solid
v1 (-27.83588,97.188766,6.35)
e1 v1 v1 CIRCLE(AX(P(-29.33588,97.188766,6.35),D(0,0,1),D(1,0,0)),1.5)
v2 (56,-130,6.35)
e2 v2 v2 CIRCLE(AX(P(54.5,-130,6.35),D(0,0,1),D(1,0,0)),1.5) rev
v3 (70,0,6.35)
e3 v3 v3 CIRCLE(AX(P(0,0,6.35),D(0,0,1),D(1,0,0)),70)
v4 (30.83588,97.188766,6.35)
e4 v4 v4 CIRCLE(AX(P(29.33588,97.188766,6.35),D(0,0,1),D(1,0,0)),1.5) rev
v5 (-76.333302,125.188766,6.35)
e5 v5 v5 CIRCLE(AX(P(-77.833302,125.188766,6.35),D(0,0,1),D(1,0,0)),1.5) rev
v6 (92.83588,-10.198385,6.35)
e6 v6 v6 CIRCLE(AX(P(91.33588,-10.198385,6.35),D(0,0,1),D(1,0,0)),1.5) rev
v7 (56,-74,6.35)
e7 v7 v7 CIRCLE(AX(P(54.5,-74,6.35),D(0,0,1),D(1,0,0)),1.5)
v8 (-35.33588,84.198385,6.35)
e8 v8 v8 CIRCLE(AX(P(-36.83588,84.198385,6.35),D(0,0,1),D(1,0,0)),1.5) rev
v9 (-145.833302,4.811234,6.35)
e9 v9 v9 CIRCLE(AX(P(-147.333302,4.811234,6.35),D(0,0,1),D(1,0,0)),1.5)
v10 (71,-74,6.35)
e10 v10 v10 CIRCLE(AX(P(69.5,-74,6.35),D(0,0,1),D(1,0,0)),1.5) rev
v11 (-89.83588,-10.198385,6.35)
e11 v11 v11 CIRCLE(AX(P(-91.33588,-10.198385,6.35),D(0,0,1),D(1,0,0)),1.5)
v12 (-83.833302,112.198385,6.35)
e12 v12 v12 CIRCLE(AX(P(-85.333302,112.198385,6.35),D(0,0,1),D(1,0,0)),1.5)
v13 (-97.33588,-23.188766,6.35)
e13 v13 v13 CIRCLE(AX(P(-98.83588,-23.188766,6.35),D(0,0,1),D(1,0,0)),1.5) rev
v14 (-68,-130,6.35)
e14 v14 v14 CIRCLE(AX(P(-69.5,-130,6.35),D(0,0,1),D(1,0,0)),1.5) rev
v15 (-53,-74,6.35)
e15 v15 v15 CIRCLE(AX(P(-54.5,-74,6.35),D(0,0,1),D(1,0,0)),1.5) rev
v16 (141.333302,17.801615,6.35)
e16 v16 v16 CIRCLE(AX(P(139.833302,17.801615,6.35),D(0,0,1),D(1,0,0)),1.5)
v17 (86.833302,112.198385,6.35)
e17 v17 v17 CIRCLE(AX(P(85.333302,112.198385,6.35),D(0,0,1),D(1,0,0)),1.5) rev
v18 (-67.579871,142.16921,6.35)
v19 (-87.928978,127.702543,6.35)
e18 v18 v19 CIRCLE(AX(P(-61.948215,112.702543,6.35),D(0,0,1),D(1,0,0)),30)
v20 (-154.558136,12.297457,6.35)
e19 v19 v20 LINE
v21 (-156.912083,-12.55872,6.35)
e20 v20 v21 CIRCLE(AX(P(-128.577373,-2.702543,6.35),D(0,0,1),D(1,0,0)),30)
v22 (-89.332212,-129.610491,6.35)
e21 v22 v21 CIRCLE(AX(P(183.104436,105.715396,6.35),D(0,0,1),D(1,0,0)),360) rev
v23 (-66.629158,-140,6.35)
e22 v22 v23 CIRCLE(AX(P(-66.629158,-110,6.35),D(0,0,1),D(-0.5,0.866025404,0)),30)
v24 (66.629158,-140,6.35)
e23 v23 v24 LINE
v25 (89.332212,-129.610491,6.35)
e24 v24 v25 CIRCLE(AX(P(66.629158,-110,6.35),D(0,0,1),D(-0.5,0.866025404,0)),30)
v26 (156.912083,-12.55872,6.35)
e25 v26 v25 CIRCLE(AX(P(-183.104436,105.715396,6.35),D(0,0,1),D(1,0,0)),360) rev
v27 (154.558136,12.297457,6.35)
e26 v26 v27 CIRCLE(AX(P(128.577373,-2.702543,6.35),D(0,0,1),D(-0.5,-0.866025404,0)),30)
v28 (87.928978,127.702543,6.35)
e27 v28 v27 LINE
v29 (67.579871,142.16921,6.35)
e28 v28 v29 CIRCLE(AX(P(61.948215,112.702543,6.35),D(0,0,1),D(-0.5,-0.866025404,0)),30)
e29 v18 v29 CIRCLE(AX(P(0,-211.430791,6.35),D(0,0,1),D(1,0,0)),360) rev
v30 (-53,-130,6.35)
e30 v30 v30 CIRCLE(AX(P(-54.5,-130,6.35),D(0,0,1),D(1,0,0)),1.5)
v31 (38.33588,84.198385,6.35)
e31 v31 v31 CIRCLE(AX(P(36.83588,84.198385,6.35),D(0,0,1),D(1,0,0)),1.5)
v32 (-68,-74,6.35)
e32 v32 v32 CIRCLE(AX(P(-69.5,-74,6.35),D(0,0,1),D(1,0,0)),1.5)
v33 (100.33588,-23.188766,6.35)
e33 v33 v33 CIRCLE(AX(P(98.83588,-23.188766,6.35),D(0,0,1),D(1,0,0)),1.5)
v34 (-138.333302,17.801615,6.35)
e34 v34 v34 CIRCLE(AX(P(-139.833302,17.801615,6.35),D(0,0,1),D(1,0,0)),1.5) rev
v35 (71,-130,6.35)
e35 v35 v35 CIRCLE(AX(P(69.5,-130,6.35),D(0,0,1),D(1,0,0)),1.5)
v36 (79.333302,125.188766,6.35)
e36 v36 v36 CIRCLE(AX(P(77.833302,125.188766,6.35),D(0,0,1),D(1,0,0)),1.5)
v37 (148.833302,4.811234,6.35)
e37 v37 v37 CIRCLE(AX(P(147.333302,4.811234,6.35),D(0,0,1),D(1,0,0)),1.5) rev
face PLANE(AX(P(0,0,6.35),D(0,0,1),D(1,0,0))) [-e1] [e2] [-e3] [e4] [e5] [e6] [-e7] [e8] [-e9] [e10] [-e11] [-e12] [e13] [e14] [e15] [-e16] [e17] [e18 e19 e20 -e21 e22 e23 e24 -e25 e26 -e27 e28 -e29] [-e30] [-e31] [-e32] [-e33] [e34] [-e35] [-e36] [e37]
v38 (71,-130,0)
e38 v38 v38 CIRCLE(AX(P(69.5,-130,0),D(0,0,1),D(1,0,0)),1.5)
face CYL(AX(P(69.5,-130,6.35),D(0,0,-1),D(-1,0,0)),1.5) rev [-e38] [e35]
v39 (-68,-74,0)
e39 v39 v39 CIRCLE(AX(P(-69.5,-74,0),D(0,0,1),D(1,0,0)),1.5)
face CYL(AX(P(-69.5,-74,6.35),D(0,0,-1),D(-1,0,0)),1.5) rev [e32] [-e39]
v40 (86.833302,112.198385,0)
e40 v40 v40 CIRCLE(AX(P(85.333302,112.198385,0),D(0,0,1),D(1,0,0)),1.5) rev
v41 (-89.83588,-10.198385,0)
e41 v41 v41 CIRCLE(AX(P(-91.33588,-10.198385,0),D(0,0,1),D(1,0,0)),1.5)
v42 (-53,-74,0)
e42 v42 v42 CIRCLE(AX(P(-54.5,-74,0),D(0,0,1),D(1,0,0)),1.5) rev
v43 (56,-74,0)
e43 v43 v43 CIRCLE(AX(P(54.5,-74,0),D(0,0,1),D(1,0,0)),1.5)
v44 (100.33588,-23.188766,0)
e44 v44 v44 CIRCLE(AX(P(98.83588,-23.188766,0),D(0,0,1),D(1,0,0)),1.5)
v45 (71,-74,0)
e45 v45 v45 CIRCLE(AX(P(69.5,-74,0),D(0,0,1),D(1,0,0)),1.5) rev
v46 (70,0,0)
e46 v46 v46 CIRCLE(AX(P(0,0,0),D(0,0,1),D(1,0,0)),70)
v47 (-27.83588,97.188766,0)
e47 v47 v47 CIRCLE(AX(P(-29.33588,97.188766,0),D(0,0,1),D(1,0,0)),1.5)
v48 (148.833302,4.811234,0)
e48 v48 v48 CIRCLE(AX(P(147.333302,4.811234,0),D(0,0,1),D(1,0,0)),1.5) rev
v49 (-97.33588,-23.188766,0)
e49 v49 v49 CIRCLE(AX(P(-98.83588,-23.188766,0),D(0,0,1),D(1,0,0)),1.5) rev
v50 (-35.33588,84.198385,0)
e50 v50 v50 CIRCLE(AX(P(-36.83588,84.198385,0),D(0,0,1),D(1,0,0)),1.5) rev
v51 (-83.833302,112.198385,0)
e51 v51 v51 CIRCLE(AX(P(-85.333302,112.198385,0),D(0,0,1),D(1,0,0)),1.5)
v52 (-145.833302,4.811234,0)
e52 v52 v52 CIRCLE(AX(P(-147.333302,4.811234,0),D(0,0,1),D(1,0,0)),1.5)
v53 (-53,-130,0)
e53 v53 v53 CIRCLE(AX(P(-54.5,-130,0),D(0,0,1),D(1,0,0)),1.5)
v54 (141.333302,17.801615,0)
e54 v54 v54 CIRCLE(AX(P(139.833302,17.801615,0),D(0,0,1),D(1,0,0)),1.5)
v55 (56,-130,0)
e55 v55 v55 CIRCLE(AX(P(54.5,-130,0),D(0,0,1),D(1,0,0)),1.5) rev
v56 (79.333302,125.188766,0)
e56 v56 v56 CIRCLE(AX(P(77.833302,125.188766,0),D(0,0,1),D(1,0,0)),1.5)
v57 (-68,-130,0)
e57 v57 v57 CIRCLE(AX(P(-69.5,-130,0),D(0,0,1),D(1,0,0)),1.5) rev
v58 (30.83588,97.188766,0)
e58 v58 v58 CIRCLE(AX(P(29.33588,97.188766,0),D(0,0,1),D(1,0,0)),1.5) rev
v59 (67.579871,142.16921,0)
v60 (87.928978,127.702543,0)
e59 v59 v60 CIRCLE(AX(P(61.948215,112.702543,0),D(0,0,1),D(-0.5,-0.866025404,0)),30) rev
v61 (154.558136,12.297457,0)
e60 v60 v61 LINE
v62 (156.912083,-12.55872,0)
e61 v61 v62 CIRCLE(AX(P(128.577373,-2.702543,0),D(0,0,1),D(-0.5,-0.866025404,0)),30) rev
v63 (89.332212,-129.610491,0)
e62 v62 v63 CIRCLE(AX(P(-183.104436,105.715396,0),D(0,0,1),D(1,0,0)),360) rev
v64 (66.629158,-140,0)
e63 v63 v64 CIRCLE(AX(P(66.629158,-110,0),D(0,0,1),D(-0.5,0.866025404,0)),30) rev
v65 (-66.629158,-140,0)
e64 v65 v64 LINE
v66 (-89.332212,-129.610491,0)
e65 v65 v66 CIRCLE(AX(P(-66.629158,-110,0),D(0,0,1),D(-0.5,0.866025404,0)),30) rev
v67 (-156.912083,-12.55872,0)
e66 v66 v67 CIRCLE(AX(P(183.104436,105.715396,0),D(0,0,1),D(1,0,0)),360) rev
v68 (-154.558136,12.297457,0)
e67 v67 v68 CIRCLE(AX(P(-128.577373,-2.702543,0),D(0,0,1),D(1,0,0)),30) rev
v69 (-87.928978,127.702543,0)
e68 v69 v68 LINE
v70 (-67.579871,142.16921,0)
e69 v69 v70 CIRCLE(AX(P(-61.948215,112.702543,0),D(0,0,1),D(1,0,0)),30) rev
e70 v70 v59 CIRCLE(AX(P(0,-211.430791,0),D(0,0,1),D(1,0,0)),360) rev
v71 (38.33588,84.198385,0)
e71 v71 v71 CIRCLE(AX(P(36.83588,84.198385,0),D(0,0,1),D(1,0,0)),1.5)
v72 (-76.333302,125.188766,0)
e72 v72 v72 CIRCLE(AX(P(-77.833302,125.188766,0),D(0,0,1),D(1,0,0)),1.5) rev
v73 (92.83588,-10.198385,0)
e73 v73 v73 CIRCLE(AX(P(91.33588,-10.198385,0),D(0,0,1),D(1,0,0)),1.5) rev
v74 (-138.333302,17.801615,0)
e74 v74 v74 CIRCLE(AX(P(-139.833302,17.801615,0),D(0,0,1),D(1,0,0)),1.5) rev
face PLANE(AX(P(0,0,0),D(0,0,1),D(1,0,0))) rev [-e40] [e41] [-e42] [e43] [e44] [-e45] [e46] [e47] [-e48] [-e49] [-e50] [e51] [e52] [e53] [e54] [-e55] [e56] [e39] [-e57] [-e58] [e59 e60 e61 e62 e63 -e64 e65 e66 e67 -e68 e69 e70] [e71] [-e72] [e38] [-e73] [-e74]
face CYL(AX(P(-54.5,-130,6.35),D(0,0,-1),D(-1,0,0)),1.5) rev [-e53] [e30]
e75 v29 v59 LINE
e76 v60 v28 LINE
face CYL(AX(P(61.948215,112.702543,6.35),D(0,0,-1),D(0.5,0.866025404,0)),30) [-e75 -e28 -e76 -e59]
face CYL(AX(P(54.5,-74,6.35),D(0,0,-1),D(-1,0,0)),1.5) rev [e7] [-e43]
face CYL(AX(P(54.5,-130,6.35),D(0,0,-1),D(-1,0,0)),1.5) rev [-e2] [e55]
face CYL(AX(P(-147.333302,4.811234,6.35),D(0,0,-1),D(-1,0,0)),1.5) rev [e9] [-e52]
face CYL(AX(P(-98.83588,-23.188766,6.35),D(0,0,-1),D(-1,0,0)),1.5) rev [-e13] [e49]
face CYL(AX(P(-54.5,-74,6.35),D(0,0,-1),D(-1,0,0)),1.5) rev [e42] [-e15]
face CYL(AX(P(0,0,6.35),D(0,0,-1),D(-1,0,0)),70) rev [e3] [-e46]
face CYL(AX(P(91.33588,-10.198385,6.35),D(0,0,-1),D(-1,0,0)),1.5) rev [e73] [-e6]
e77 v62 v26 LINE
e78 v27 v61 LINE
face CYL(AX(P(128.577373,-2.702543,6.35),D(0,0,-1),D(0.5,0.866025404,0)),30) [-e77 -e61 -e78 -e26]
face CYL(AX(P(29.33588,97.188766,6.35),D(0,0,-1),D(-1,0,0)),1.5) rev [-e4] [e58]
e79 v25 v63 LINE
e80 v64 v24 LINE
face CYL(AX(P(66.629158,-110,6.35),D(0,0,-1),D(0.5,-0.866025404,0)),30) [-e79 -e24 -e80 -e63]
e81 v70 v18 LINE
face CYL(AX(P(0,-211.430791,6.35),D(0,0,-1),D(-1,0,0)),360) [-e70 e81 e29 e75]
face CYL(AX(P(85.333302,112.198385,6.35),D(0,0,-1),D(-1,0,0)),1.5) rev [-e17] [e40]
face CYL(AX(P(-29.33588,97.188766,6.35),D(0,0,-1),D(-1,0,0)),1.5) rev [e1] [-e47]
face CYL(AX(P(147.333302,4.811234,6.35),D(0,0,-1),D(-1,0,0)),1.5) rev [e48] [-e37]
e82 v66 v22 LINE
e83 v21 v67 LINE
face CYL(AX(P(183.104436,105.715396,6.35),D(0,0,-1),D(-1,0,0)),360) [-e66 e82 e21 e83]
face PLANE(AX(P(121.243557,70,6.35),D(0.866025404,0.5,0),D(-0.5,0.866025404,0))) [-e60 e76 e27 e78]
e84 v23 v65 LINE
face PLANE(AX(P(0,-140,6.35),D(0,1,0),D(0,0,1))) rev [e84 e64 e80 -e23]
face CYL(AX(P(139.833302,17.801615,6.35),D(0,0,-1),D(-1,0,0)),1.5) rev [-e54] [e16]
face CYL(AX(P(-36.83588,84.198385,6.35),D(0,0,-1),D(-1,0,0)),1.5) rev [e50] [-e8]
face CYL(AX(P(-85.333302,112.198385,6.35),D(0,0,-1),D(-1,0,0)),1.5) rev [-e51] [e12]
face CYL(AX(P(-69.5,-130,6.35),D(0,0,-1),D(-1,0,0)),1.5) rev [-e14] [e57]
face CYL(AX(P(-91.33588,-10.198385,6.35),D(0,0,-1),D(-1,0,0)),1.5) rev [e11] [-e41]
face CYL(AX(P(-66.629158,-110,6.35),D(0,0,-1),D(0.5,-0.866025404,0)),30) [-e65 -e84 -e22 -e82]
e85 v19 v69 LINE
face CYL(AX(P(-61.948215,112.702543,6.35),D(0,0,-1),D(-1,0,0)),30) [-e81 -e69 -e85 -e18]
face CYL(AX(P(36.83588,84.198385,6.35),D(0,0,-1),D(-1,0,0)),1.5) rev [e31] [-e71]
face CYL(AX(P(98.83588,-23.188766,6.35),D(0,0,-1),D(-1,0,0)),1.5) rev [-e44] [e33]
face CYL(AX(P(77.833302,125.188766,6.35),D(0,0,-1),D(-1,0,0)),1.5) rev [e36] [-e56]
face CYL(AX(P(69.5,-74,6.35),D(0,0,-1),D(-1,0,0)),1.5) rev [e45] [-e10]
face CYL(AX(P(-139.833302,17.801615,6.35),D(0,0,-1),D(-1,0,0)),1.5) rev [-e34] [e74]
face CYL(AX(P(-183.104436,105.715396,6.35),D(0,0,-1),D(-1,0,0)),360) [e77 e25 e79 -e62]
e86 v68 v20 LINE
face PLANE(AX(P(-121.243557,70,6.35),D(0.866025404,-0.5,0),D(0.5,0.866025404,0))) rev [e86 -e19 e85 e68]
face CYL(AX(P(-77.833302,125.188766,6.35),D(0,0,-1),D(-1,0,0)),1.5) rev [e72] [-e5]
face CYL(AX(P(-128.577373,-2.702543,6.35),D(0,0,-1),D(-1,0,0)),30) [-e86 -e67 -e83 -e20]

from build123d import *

# Parameters (mm, degrees)
SKETCH1_R           = 1.5
SKETCH1_R_2         = 70
BOSS_EXTRUDE2_DEPTH = 6.35
FILLET1_R           = 30
CIRPATTERN1_DEPTH   = 6.35


# Read off the part's stored shape, not the designer's step: CirPattern1
with BuildPart() as part:
    # Sketch1 → Boss-Extrude2 (new body)
    with BuildSketch(Plane.XY):
        with BuildLine():
            ThreePointArc((80, -140), (128.664709099, -74.284604433), (161.24355653, 0.717967697))
            Line((161.24355653, 0.717967697), (81.24355653, 139.282032303))
            ThreePointArc((81.24355653, 139.282032303), (0, 148.569208867), (-81.24355653, 139.282032303))
            Line((-81.24355653, 139.282032303), (-161.24355653, 0.717967697))
            ThreePointArc((-161.24355653, 0.717967697), (-128.664709099, -74.284604433), (-80, -140))
            Line((-80, -140), (80, -140))
        make_face()
        with Locations((85.333302492, 112.198384506)):
            Circle(SKETCH1_R, mode=Mode.SUBTRACT)
        with Locations((-85.333302492, 112.198384506)):
            Circle(SKETCH1_R, mode=Mode.SUBTRACT)
        with Locations((-69.5, -130)):
            Circle(SKETCH1_R, mode=Mode.SUBTRACT)
        with Locations((-54.5, -130)):
            Circle(SKETCH1_R, mode=Mode.SUBTRACT)
        with Locations((-69.5, -74)):
            Circle(SKETCH1_R, mode=Mode.SUBTRACT)
        with Locations((-54.5, -74)):
            Circle(SKETCH1_R, mode=Mode.SUBTRACT)
        with Locations((-98.83587988, -23.188765563)):
            Circle(SKETCH1_R, mode=Mode.SUBTRACT)
        with Locations((54.5, -130)):
            Circle(SKETCH1_R, mode=Mode.SUBTRACT)
        with Locations((69.5, -130)):
            Circle(SKETCH1_R, mode=Mode.SUBTRACT)
        with Locations((54.5, -74)):
            Circle(SKETCH1_R, mode=Mode.SUBTRACT)
        with Locations((69.5, -74)):
            Circle(SKETCH1_R, mode=Mode.SUBTRACT)
        with Locations((98.83587988, -23.188765563)):
            Circle(SKETCH1_R, mode=Mode.SUBTRACT)
        with Locations((-147.333302492, 4.811234437)):
            Circle(SKETCH1_R, mode=Mode.SUBTRACT)
        with Locations((-91.33587988, -10.198384506)):
            Circle(SKETCH1_R, mode=Mode.SUBTRACT)
        with Locations((-139.833302492, 17.801615494)):
            Circle(SKETCH1_R, mode=Mode.SUBTRACT)
        Circle(SKETCH1_R_2, mode=Mode.SUBTRACT)
        with Locations((-36.83587988, 84.198384506)):
            Circle(SKETCH1_R, mode=Mode.SUBTRACT)
        with Locations((-29.33587988, 97.188765563)):
            Circle(SKETCH1_R, mode=Mode.SUBTRACT)
        with Locations((91.33587988, -10.198384506)):
            Circle(SKETCH1_R, mode=Mode.SUBTRACT)
        with Locations((147.333302492, 4.811234437)):
            Circle(SKETCH1_R, mode=Mode.SUBTRACT)
        with Locations((139.833302492, 17.801615494)):
            Circle(SKETCH1_R, mode=Mode.SUBTRACT)
        with Locations((36.83587988, 84.198384506)):
            Circle(SKETCH1_R, mode=Mode.SUBTRACT)
        with Locations((29.33587988, 97.188765563)):
            Circle(SKETCH1_R, mode=Mode.SUBTRACT)
        with Locations((77.833302492, 125.188765563)):
            Circle(SKETCH1_R, mode=Mode.SUBTRACT)
        with Locations((-77.833302492, 125.188765563)):
            Circle(SKETCH1_R, mode=Mode.SUBTRACT)
    extrude(amount=BOSS_EXTRUDE2_DEPTH)

    # Fillet1
    fillet1_edges = [part.edges().sort_by_distance(p)[0] for p in [
        (-161.24355653, 0.717967697, 3.175),
        (-81.24355653, 139.282032303, 3.175),
    ]]
    fillet(fillet1_edges, radius=FILLET1_R)

    # CirPattern1 outline → CirPattern1 (cut)
    with BuildSketch(Plane.XY):
        with BuildLine():
            ThreePointArc((81.24355653, 139.282032303), (74.425715453, 140.791884002), (67.57987135, 142.169210265))
            ThreePointArc((67.57987135, 142.169210265), (79.330889418, 137.153364411), (87.928977518, 127.702543481))
            Line((87.928977518, 127.702543481), (81.24355653, 139.282032303))
        make_face()
        with BuildLine():
            Line((-80, -140), (-66.629158024, -140))
            ThreePointArc((-66.629158024, -140), (-79.112853086, -137.279247746), (-89.33221205, -129.610490506))
            ThreePointArc((-89.33221205, -129.610490506), (-84.716490466, -134.850502278), (-80, -140))
        make_face()
        with BuildLine():
            ThreePointArc((80, -140), (84.716490466, -134.850502278), (89.33221205, -129.610490506))
            ThreePointArc((89.33221205, -129.610490506), (79.112853086, -137.279247746), (66.629158024, -140))
            Line((66.629158024, -140), (80, -140))
        make_face()
        with BuildLine():
            Line((161.24355653, 0.717967697), (154.558135542, 12.297456519))
            ThreePointArc((154.558135542, 12.297456519), (158.443742503, 0.125883335), (156.9120834, -12.558719758))
            ThreePointArc((156.9120834, -12.558719758), (159.142205919, -5.941381724), (161.24355653, 0.717967697))
        make_face()
    extrude(amount=CIRPATTERN1_DEPTH, mode=Mode.SUBTRACT)


solid = part.part
